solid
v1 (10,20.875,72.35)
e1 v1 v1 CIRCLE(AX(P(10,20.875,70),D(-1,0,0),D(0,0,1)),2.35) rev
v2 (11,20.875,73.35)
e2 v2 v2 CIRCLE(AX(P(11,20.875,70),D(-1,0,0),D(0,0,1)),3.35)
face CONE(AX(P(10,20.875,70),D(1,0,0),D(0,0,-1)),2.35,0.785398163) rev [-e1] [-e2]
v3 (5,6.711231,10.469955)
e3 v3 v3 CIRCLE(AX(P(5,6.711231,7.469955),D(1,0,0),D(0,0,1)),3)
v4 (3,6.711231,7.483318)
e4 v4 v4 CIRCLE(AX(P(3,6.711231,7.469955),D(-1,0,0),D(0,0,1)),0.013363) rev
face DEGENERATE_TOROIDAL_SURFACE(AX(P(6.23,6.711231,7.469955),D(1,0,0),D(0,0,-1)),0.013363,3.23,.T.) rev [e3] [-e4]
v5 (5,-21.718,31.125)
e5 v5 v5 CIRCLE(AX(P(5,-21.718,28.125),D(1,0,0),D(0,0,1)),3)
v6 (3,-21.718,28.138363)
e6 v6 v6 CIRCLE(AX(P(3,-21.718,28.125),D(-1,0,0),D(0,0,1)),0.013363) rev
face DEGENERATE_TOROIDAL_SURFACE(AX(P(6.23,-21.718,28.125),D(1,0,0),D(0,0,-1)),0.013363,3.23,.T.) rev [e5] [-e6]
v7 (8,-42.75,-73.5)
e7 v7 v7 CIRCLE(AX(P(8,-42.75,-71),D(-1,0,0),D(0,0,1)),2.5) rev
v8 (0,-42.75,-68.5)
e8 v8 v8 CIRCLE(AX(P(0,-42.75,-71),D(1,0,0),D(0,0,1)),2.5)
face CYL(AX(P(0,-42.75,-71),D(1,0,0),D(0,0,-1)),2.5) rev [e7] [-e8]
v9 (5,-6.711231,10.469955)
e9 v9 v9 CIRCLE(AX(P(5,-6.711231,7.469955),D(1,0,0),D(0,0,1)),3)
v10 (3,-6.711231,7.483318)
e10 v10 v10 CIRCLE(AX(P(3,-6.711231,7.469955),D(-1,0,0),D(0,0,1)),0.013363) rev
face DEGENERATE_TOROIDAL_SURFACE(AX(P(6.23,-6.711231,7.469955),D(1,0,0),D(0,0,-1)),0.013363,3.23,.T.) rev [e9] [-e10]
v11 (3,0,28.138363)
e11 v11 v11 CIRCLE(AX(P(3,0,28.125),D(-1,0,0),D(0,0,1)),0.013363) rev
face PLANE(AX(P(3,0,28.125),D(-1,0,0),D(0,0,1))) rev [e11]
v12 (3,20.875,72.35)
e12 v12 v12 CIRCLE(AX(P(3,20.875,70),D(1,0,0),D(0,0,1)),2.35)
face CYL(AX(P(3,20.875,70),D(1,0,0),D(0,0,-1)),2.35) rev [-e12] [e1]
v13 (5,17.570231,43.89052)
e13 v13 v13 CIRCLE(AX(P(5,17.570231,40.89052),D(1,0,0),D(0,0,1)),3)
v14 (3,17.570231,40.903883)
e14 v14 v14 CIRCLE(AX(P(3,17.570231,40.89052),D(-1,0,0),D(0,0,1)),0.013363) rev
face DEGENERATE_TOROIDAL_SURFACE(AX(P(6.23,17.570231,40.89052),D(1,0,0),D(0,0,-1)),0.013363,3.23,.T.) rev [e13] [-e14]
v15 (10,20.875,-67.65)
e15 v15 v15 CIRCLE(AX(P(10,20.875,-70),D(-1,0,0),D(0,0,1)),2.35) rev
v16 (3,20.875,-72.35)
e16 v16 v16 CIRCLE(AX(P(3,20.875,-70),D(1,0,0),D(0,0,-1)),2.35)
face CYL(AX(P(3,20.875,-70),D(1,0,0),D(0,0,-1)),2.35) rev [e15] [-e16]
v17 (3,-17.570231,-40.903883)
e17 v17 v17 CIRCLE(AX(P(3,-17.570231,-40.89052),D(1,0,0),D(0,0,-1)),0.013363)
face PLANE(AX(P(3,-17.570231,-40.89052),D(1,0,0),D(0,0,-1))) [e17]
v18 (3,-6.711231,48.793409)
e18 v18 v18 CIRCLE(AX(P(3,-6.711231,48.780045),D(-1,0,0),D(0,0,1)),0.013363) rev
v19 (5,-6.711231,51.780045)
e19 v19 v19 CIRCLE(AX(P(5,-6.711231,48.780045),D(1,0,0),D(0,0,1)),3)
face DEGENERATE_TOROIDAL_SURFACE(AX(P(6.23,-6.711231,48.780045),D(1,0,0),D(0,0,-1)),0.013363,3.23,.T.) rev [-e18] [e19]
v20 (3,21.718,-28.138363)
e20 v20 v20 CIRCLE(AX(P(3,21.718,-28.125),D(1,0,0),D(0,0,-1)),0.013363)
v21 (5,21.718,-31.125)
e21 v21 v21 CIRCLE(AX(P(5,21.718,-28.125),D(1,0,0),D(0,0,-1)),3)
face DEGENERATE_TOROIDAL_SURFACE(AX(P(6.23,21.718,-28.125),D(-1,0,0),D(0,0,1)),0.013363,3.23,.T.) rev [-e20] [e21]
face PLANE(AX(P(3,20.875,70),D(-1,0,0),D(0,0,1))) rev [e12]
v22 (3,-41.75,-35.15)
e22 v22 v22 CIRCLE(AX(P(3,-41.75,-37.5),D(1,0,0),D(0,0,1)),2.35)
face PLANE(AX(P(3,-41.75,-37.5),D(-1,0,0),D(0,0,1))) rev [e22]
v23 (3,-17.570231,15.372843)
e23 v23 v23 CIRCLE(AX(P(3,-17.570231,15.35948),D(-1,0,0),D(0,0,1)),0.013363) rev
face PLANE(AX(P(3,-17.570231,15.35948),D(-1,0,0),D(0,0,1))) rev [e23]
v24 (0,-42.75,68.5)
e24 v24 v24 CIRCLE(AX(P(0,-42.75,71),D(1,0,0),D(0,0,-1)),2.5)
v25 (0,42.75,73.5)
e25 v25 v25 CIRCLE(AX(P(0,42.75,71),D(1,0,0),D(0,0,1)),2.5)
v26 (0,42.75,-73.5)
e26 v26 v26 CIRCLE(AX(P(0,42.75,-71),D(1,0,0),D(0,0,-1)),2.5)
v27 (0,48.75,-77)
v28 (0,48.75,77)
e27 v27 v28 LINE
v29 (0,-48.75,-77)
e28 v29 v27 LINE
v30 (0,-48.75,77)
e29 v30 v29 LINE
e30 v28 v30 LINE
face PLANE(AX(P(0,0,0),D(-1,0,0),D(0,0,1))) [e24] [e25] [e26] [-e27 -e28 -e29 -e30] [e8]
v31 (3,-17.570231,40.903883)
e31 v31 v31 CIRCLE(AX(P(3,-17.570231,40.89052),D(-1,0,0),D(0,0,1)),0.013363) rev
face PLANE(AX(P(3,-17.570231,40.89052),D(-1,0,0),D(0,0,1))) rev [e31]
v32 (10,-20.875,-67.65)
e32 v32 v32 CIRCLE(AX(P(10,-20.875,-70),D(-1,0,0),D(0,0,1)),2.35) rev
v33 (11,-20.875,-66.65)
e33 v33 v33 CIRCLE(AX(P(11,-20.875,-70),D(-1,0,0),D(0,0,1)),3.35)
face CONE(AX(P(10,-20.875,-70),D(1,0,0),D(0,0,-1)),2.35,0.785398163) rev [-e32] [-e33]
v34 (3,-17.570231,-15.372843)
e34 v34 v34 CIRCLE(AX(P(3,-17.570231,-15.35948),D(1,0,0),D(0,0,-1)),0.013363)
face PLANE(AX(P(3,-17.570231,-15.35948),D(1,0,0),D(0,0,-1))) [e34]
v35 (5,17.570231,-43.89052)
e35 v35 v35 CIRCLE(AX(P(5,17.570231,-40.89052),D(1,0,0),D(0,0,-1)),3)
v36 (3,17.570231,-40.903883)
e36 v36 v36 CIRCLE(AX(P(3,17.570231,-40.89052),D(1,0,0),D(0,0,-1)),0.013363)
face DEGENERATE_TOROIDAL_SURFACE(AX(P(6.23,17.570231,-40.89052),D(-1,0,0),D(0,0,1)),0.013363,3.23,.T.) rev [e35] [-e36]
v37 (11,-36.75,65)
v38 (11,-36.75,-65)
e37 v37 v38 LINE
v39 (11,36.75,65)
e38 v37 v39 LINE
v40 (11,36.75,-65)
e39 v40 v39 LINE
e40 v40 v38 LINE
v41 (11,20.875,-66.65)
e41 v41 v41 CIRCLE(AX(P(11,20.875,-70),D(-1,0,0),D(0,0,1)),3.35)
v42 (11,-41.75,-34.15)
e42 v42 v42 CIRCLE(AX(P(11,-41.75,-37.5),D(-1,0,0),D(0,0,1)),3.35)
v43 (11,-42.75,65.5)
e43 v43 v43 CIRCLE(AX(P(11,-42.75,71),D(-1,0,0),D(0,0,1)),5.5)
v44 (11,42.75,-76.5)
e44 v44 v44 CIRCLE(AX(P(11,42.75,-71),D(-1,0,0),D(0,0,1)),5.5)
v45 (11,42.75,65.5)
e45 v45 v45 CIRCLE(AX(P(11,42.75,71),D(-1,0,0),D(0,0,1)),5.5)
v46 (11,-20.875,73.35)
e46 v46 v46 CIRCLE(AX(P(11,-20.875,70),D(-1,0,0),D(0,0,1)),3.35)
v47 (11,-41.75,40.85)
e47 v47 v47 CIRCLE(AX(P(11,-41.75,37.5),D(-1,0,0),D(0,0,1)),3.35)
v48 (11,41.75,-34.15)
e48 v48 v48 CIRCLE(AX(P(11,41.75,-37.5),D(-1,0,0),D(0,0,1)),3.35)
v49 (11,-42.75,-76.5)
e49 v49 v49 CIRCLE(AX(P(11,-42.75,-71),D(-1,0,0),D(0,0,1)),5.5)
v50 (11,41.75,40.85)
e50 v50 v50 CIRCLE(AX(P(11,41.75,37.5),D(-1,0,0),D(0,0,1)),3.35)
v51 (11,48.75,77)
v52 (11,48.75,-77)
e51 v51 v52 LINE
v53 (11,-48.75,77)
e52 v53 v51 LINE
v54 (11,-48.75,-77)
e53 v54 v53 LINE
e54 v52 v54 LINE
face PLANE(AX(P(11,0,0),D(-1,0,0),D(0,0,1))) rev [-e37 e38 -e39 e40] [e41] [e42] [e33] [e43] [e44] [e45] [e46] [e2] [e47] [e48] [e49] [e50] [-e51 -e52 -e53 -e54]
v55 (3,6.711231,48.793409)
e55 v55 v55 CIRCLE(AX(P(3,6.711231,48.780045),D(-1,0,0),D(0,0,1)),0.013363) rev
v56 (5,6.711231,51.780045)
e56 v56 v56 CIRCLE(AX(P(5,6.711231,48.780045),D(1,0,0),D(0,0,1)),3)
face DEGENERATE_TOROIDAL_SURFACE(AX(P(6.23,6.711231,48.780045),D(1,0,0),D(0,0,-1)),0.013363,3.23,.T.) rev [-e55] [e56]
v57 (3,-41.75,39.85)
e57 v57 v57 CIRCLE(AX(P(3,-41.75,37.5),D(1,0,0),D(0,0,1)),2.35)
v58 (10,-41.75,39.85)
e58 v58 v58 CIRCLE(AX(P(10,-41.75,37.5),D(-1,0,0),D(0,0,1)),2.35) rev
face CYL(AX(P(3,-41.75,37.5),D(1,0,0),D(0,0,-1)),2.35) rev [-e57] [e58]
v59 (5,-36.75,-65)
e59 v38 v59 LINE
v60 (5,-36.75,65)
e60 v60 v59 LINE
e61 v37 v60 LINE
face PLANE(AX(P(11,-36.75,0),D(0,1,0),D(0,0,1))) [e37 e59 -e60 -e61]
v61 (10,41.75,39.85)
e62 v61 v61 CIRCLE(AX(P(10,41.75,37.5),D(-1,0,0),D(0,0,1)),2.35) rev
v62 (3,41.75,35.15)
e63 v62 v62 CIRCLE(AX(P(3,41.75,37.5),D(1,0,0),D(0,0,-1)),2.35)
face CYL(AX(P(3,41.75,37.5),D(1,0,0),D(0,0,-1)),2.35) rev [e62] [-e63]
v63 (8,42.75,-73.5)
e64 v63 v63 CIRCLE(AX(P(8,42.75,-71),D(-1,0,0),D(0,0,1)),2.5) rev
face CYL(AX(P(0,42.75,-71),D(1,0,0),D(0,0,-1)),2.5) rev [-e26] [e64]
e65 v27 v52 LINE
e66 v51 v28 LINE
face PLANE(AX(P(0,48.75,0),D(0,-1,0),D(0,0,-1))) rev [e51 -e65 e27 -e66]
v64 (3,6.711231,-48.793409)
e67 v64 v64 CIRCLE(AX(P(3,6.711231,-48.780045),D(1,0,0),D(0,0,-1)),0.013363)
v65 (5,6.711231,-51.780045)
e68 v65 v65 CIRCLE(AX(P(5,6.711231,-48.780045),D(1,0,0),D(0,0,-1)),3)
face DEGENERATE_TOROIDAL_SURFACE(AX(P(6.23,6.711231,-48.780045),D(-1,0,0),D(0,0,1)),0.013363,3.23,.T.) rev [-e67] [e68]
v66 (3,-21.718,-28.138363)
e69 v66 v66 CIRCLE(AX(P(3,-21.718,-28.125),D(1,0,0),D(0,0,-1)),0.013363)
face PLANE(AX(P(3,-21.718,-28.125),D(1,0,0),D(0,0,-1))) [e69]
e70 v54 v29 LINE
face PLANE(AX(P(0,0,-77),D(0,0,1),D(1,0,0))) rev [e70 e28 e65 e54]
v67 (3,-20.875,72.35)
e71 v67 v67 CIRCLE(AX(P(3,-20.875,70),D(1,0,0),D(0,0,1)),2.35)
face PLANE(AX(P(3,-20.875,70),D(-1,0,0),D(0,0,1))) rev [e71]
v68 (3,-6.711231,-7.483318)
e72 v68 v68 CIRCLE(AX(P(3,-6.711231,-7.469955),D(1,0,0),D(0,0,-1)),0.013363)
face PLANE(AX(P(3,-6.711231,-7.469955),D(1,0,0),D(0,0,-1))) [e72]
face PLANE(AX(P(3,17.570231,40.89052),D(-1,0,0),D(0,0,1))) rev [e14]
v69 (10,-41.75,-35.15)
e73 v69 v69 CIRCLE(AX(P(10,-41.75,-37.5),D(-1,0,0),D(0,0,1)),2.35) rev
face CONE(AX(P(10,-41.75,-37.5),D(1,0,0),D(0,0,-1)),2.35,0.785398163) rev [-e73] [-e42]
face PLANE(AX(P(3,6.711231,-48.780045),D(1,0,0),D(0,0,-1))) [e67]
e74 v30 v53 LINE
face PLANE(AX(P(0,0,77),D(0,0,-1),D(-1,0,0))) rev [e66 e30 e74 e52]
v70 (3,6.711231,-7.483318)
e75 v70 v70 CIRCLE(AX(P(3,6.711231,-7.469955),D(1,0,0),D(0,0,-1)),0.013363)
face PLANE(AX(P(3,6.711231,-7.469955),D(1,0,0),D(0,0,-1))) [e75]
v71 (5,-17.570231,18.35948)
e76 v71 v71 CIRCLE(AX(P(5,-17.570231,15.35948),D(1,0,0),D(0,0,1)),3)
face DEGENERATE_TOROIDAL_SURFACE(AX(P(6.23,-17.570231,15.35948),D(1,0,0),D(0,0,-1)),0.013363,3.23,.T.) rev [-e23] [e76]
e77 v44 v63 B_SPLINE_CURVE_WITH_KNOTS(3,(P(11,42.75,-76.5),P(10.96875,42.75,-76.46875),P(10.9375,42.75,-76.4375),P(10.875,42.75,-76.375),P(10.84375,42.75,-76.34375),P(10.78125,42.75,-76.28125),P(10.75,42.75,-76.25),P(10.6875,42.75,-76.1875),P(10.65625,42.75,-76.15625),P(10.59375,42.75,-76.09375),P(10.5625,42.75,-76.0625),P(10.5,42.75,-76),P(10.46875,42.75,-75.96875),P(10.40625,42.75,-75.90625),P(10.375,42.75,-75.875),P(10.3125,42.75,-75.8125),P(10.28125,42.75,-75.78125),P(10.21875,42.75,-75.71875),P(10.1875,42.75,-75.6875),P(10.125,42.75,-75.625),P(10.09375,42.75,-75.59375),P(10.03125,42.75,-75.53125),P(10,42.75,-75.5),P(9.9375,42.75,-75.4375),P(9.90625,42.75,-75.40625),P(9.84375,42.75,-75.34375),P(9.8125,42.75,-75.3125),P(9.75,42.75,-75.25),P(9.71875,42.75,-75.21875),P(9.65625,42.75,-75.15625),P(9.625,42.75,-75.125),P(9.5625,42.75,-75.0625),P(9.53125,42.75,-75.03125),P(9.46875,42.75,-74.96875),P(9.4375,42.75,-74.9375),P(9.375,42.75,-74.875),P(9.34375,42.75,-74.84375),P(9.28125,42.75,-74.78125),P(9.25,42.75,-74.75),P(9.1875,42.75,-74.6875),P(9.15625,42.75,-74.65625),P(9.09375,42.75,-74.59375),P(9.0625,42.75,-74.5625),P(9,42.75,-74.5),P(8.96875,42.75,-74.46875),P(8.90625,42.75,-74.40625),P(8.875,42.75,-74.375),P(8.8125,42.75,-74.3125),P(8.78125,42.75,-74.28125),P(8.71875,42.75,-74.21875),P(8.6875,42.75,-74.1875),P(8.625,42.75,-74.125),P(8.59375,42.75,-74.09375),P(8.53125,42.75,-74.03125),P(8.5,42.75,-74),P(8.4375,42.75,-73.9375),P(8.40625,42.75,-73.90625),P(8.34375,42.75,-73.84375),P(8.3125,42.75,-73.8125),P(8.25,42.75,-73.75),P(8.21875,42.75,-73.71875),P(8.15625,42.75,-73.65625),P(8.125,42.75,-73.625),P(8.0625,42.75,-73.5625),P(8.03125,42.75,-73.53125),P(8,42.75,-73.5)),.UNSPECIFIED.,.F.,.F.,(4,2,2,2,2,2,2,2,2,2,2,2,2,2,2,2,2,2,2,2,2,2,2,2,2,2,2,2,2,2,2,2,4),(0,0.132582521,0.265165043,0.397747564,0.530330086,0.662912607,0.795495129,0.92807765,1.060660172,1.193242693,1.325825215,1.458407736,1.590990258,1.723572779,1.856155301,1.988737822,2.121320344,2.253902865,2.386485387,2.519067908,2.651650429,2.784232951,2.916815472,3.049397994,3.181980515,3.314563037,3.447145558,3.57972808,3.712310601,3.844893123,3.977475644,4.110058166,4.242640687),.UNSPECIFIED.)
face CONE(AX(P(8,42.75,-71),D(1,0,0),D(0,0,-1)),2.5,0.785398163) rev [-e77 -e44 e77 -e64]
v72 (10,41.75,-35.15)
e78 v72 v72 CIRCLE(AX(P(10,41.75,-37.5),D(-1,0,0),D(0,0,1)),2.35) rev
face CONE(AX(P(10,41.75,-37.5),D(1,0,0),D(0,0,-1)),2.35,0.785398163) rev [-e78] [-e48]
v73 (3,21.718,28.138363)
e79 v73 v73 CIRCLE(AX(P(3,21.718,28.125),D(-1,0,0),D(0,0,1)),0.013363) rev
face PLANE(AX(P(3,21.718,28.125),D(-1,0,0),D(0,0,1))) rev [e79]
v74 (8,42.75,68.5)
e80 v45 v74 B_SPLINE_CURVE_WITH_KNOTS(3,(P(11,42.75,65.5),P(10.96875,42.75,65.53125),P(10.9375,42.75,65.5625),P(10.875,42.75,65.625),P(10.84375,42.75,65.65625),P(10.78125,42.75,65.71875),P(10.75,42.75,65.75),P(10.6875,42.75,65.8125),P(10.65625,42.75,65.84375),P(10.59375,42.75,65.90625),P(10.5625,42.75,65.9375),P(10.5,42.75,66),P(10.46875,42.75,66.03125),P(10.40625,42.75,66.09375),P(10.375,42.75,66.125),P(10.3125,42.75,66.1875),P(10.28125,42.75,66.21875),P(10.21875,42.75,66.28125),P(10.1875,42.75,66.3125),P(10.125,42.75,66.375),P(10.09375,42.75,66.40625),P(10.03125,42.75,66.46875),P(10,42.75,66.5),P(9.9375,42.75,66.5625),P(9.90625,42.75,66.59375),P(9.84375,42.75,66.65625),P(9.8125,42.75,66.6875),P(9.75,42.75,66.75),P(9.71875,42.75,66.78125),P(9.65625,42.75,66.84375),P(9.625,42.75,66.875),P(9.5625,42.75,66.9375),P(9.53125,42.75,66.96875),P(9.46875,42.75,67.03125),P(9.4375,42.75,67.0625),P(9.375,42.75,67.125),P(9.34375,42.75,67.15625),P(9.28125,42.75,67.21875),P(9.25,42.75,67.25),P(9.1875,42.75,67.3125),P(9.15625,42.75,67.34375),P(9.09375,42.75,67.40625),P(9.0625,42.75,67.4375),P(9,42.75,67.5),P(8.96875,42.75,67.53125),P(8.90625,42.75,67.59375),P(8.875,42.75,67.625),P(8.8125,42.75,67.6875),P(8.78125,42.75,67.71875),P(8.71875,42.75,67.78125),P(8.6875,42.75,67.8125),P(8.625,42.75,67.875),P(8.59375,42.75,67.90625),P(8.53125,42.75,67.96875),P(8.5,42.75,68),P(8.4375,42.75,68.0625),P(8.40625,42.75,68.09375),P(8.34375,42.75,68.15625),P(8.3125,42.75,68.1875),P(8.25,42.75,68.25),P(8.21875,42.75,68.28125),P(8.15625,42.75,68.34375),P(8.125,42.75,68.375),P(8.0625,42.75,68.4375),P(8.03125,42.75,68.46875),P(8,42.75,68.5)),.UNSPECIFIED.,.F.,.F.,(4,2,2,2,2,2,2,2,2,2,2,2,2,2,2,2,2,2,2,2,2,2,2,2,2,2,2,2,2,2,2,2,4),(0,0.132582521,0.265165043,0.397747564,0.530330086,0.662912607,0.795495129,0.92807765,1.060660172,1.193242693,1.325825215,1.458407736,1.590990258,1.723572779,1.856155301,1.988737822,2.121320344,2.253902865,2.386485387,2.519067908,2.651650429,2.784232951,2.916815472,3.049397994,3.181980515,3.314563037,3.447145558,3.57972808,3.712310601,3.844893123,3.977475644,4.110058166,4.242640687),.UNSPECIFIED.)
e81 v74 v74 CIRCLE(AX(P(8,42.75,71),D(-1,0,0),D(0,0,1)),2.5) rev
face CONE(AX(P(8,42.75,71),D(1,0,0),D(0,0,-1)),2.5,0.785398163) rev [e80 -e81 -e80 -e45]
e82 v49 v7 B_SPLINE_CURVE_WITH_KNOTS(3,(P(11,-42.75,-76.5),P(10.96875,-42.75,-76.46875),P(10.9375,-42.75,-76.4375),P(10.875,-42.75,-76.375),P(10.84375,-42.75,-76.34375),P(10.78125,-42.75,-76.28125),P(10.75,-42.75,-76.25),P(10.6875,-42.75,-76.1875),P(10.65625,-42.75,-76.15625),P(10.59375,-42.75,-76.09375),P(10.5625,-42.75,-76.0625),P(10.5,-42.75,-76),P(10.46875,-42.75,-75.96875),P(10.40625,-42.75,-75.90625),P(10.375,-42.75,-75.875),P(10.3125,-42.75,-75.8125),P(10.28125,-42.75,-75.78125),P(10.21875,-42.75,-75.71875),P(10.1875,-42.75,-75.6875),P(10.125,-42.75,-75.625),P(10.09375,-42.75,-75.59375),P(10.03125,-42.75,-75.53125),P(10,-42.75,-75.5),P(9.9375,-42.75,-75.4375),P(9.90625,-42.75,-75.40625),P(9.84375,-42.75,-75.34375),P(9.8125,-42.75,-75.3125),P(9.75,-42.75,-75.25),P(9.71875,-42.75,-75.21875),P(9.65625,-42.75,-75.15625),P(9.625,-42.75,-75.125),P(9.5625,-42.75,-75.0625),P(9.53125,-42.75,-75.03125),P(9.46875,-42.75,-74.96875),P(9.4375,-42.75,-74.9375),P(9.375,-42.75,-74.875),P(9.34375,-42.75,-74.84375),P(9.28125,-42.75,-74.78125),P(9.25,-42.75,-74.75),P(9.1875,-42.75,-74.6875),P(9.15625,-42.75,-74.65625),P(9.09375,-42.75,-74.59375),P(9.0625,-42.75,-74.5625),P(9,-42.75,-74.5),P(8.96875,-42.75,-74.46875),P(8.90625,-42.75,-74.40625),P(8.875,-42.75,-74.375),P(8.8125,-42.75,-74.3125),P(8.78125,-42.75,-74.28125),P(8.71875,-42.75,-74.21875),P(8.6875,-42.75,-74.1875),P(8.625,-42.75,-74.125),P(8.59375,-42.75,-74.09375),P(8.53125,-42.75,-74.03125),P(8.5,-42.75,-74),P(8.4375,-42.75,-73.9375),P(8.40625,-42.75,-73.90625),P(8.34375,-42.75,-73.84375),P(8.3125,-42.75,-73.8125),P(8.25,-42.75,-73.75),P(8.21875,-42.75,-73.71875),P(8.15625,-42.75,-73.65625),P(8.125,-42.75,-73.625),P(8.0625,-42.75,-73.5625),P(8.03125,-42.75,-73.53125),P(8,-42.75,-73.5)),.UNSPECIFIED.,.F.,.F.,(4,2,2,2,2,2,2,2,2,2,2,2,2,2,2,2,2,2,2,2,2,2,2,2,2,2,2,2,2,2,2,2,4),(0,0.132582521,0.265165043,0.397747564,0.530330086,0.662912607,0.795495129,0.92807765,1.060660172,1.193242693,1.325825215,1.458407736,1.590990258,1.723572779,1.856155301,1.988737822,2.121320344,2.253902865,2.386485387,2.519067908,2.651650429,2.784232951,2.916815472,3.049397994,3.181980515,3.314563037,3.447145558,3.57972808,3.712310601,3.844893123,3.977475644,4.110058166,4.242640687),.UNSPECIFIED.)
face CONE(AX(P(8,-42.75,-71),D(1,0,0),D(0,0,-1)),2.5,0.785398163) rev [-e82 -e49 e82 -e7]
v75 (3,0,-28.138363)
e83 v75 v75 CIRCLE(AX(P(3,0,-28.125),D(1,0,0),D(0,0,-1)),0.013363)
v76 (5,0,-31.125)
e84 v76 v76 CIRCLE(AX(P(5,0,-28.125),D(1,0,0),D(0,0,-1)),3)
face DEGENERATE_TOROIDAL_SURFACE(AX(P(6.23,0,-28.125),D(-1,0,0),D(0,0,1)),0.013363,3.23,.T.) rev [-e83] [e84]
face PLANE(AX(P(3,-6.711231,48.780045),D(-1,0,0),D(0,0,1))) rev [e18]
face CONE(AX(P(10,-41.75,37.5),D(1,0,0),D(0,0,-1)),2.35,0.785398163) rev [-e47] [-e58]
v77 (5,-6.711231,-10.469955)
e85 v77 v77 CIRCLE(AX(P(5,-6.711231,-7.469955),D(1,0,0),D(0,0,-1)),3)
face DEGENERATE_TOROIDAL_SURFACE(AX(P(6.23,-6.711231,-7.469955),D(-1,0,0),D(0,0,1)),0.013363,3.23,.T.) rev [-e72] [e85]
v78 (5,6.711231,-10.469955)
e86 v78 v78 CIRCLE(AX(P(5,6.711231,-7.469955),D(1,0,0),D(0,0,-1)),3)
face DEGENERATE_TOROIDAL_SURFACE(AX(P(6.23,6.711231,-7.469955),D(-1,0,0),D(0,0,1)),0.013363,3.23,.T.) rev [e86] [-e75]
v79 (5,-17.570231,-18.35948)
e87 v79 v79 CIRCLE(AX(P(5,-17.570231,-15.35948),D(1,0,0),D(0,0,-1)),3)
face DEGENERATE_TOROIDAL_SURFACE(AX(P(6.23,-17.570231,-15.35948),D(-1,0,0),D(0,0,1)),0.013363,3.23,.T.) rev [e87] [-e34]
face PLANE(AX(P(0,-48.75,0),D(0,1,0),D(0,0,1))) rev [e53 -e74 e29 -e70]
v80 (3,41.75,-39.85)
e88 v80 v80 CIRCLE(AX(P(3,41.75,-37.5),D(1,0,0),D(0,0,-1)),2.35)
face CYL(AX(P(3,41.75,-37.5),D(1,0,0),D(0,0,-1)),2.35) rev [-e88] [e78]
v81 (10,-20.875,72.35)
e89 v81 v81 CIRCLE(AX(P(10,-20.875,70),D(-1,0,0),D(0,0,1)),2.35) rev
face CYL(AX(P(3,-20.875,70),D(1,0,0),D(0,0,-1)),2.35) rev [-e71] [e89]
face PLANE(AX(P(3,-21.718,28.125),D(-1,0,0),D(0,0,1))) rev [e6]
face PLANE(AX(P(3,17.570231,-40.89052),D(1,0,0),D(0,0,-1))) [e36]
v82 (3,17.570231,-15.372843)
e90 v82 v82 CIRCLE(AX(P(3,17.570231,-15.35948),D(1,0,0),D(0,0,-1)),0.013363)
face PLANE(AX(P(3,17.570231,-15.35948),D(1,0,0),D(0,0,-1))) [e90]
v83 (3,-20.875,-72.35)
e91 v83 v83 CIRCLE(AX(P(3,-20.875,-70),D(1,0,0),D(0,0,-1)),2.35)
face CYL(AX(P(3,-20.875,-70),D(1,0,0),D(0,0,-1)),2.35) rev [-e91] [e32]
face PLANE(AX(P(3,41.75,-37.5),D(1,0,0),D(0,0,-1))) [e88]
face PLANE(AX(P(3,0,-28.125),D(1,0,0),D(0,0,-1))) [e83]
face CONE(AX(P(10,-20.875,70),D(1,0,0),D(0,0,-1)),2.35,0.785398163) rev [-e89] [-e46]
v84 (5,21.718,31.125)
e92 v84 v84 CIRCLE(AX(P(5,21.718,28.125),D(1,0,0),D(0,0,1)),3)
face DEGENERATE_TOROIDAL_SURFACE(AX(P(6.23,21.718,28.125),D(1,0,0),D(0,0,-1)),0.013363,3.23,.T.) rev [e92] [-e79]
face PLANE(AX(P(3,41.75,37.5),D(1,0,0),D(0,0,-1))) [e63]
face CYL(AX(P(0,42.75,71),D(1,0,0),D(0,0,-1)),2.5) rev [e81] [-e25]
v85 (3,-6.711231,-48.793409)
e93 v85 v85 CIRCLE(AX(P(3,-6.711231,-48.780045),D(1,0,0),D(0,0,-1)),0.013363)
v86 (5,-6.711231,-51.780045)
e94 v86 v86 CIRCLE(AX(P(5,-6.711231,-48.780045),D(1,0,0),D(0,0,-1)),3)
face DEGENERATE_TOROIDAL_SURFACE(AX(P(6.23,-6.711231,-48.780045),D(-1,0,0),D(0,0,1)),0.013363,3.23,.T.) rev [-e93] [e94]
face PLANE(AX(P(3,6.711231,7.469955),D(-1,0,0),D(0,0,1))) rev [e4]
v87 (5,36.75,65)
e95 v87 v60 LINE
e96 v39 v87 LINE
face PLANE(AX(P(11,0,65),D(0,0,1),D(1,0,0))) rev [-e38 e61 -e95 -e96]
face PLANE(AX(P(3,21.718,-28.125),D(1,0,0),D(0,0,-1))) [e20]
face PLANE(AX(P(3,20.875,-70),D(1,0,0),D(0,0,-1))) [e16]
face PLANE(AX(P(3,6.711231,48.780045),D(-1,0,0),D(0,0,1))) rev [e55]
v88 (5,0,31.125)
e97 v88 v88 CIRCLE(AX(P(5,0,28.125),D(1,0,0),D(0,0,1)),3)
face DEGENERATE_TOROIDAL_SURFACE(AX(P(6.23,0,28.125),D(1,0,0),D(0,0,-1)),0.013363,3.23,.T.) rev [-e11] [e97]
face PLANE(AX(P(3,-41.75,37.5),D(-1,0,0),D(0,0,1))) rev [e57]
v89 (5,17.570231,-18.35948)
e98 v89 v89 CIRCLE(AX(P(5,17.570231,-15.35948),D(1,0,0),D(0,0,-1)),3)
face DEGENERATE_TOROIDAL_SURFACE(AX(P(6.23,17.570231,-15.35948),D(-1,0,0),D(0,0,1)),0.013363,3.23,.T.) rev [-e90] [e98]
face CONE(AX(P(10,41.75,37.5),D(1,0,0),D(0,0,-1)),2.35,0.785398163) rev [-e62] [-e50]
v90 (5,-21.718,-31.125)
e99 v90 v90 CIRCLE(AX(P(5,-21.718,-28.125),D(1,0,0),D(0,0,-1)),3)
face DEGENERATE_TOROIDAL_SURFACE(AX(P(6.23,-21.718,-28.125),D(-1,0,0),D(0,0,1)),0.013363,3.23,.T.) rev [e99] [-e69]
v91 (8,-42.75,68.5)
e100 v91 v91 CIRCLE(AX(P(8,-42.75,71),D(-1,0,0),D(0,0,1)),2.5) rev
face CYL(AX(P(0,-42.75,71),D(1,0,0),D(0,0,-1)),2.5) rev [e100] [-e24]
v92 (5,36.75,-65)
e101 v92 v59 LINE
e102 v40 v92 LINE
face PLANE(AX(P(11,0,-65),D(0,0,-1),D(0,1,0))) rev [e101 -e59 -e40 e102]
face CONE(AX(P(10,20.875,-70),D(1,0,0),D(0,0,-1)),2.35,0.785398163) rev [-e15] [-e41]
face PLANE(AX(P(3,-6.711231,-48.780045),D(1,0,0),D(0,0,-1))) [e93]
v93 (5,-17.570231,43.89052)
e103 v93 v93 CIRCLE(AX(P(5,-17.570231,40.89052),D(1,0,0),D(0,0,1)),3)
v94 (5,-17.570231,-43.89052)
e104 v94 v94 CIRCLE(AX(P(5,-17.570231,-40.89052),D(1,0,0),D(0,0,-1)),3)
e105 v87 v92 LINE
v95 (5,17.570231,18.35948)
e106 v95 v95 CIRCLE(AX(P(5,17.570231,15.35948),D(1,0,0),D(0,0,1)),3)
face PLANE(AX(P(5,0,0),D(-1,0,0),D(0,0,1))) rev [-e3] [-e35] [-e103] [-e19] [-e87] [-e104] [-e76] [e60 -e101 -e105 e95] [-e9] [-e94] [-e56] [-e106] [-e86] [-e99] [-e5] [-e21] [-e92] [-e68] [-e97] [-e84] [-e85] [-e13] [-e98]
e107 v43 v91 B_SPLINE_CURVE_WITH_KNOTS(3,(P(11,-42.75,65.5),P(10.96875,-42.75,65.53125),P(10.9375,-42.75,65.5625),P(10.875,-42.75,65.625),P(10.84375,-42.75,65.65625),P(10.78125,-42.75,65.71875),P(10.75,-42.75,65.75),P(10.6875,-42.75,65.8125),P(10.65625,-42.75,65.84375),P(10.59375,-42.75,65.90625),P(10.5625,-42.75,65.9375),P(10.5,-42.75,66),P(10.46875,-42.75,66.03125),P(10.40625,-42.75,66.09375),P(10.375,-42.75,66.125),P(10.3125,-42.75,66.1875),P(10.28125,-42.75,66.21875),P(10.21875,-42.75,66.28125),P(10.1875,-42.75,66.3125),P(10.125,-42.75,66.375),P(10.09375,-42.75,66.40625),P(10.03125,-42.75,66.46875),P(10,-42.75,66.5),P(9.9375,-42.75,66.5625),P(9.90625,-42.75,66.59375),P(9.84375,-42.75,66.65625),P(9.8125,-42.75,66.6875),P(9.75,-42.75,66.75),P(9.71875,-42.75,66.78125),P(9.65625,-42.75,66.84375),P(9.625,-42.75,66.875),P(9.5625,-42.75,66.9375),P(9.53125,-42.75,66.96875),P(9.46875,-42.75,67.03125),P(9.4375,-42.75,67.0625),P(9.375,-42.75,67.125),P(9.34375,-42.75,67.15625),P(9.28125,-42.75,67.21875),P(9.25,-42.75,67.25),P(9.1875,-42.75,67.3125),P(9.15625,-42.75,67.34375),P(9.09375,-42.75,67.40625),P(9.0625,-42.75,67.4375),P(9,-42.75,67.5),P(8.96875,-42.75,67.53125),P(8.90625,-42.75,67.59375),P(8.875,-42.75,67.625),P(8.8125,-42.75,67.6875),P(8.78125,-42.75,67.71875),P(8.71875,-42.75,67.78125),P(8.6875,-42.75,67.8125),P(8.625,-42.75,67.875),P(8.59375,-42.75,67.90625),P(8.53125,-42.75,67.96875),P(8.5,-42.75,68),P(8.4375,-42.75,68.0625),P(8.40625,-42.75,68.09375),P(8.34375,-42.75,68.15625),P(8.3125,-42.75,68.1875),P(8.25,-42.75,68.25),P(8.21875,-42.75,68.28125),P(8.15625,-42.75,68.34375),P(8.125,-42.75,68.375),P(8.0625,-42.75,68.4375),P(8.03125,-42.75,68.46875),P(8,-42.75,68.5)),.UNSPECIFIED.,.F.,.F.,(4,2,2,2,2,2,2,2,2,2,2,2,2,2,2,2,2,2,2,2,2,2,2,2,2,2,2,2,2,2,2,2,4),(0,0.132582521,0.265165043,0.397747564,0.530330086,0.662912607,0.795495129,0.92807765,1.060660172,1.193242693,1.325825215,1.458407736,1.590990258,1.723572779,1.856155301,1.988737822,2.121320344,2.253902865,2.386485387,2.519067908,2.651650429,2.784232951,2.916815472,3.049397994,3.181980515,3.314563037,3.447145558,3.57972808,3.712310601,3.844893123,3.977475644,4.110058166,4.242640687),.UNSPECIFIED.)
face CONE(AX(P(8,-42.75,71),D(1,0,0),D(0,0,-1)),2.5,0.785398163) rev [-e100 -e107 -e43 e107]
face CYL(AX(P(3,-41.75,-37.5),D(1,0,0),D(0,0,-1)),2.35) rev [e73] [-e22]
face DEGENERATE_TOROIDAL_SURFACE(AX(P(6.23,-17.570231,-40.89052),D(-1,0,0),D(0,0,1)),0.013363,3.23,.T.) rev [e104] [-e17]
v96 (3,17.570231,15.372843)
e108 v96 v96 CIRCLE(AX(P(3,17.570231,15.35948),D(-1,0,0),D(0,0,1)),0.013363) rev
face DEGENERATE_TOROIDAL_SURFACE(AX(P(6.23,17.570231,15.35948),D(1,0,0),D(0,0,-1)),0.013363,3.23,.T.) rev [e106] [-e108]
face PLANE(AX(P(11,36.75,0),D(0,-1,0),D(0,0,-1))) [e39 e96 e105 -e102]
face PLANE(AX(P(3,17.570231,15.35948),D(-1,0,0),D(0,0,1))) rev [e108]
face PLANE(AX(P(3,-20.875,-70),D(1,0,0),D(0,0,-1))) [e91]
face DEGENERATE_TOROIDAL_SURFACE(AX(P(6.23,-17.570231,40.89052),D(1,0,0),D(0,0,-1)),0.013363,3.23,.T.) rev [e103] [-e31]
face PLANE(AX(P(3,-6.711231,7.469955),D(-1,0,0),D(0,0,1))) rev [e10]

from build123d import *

# Parameters (mm, degrees)
SKETCH1_W           = 130
SKETCH1_H           = 73.5
BOSS_EXTRUDE1_DEPTH = 5
SKETCH2_R           = 3
CUT_EXTRUDE1_DEPTH  = 2
FILLET1_R           = 3.23
SKETCH3_W           = 10
SKETCH3_H           = 73.5
BOSS_EXTRUDE2_DEPTH = 11
SKETCH4_R           = 2.35
CUT_EXTRUDE2_DEPTH  = 8
CHAMFER1_SIZE       = 1
SKETCH5_W           = 11
SKETCH5_H           = 150
BOSS_EXTRUDE3_DEPTH = 2
SKETCH6_W           = 11
SKETCH6_H           = 150
BOSS_EXTRUDE4_DEPTH = 2
SKETCH7_W           = 11
SKETCH7_H           = 97.5
BOSS_EXTRUDE5_DEPTH = 2
SKETCH8_W           = 11
SKETCH8_H           = 97.5
BOSS_EXTRUDE6_DEPTH = 2
SKETCH12_R          = 2.5
CUT_EXTRUDE3_DEPTH  = 92.796309839
CHAMFER2_SIZE       = 3


with BuildPart() as part:
    # Sketch1 → Boss-Extrude1 (new body)
    with BuildSketch(Plane(origin=(0, 0, 0), x_dir=(0, 0, -1), z_dir=(1, 0, 0))):
        Rectangle(SKETCH1_W, SKETCH1_H)
    extrude(amount=BOSS_EXTRUDE1_DEPTH)

    # Sketch2 → Cut-Extrude1 (cut)
    with BuildSketch(Plane(origin=(5, 0, 0), x_dir=(0, 0, -1), z_dir=(1, 0, 0))):
        with Locations((28.125, -21.718)):
            Circle(SKETCH2_R)
        with Locations((15.359479891, -17.570231084)):
            Circle(SKETCH2_R)
        with Locations((7.469954579, -6.711231084)):
            Circle(SKETCH2_R)
        with Locations((7.469954579, 6.711231084)):
            Circle(SKETCH2_R)
        with Locations((15.359479891, 17.570231084)):
            Circle(SKETCH2_R)
        with Locations((28.125, 21.718)):
            Circle(SKETCH2_R)
        with Locations((40.890520109, 17.570231084)):
            Circle(SKETCH2_R)
        with Locations((48.780045421, 6.711231084)):
            Circle(SKETCH2_R)
        with Locations((48.780045421, -6.711231084)):
            Circle(SKETCH2_R)
        with Locations((40.890520109, -17.570231084)):
            Circle(SKETCH2_R)
        with Locations(Location((-7.469954579, -6.711231084, 0), (0, 0, 180))):
            Circle(SKETCH2_R)
        with Locations(Location((-15.359479891, -17.570231084, 0), (0, 0, 180))):
            Circle(SKETCH2_R)
        with Locations(Location((-28.125, -21.718, 0), (0, 0, 180))):
            Circle(SKETCH2_R)
        with Locations(Location((-40.890520109, -17.570231084, 0), (0, 0, 180))):
            Circle(SKETCH2_R)
        with Locations(Location((-48.780045421, -6.711231084, 0), (0, 0, 180))):
            Circle(SKETCH2_R)
        with Locations(Location((-48.780045421, 6.711231084, 0), (0, 0, 180))):
            Circle(SKETCH2_R)
        with Locations(Location((-40.890520109, 17.570231084, 0), (0, 0, 180))):
            Circle(SKETCH2_R)
        with Locations(Location((-28.125, 21.718, 0), (0, 0, 180))):
            Circle(SKETCH2_R)
        with Locations(Location((-15.359479891, 17.570231084, 0), (0, 0, 180))):
            Circle(SKETCH2_R)
        with Locations(Location((-7.469954579, 6.711231084, 0), (0, 0, 180))):
            Circle(SKETCH2_R)
        with Locations((28.125, 0)):
            Circle(SKETCH2_R)
        with Locations(Location((-28.125, 0, 0), (0, 0, 180))):
            Circle(SKETCH2_R)
    extrude(amount=-CUT_EXTRUDE1_DEPTH, mode=Mode.SUBTRACT)

    # Fillet1
    # the kernel refuses this fillet: 3.23 mm, written as the material it adds along each edge
    with BuildSketch(Plane(origin=(3, 17.570231084, 40.890520109), x_dir=(0, 0, 1), z_dir=(0, 1, 0))) as fillet1_piece_1:
        with BuildLine():
            CenterArc((0.013363095, 3.23), FILLET1_R, 270, 67.616447755)
            Line((0.013363095, 0), (0.013363095, -0.0646))
            Line((0.013363095, -0.0646), (3, -0.0646))
            Line((3, -0.0646), (3.0646, 0))
            ThreePointArc((3.0646, 0), (3.0646, 1), (3.059732738, 1.9754))
            Line((3.059732738, 1.9754), (3, 2))
        make_face()
    revolve(axis=Axis((3, 17.570231084, 40.890520109), (1, 0, 0)))
    with BuildSketch(Plane(origin=(3, 6.711231084, 48.780045421), x_dir=(0, 0, 1), z_dir=(0, 1, 0))) as fillet1_piece_2:
        with BuildLine():
            CenterArc((0.013363095, 3.23), FILLET1_R, 270, 67.616447755)
            Line((0.013363095, 0), (0.013363095, -0.0646))
            Line((0.013363095, -0.0646), (3, -0.0646))
            Line((3, -0.0646), (3.0646, 0))
            ThreePointArc((3.0646, 0), (3.0646, 1), (3.059732738, 1.9754))
            Line((3.059732738, 1.9754), (3, 2))
        make_face()
    revolve(axis=Axis((3, 6.711231084, 48.780045421), (1, 0, 0)))
    with BuildSketch(Plane(origin=(3, -6.711231084, 48.780045421), x_dir=(0, 0, 1), z_dir=(0, 1, 0))) as fillet1_piece_3:
        with BuildLine():
            CenterArc((0.013363095, 3.23), FILLET1_R, 270, 67.616447755)
            Line((0.013363095, 0), (0.013363095, -0.0646))
            Line((0.013363095, -0.0646), (3, -0.0646))
            Line((3, -0.0646), (3.0646, 0))
            ThreePointArc((3.0646, 0), (3.0646, 1), (3.059732738, 1.9754))
            Line((3.059732738, 1.9754), (3, 2))
        make_face()
    revolve(axis=Axis((3, -6.711231084, 48.780045421), (1, 0, 0)))
    with BuildSketch(Plane(origin=(3, -17.570231084, 40.890520109), x_dir=(0, 0, 1), z_dir=(0, 1, 0))) as fillet1_piece_4:
        with BuildLine():
            CenterArc((0.013363095, 3.23), FILLET1_R, 270, 67.616447755)
            Line((0.013363095, 0), (0.013363095, -0.0646))
            Line((0.013363095, -0.0646), (3, -0.0646))
            Line((3, -0.0646), (3.0646, 0))
            ThreePointArc((3.0646, 0), (3.0646, 1), (3.059732738, 1.9754))
            Line((3.059732738, 1.9754), (3, 2))
        make_face()
    revolve(axis=Axis((3, -17.570231084, 40.890520109), (1, 0, 0)))
    with BuildSketch(Plane(origin=(3, -21.718, 28.125), x_dir=(0, 0, 1), z_dir=(0, 1, 0))) as fillet1_piece_5:
        with BuildLine():
            CenterArc((0.013363095, 3.23), FILLET1_R, 270, 67.616447755)
            Line((0.013363095, 0), (0.013363095, -0.0646))
            Line((0.013363095, -0.0646), (3, -0.0646))
            Line((3, -0.0646), (3.0646, 0))
            ThreePointArc((3.0646, 0), (3.0646, 1), (3.059732738, 1.9754))
            Line((3.059732738, 1.9754), (3, 2))
        make_face()
    revolve(axis=Axis((3, -21.718, 28.125), (1, 0, 0)))
    with BuildSketch(Plane(origin=(3, -17.570231084, 15.359479891), x_dir=(0, 0, 1), z_dir=(0, 1, 0))) as fillet1_piece_6:
        with BuildLine():
            CenterArc((0.013363095, 3.23), FILLET1_R, 270, 67.616447755)
            Line((0.013363095, 0), (0.013363095, -0.0646))
            Line((0.013363095, -0.0646), (3, -0.0646))
            Line((3, -0.0646), (3.0646, 0))
            ThreePointArc((3.0646, 0), (3.0646, 1), (3.059732738, 1.9754))
            Line((3.059732738, 1.9754), (3, 2))
        make_face()
    revolve(axis=Axis((3, -17.570231084, 15.359479891), (1, 0, 0)))
    with BuildSketch(Plane(origin=(3, -17.570231084, -40.890520109), x_dir=(0, 0, -1), z_dir=(0, -1, 0))) as fillet1_piece_7:
        with BuildLine():
            CenterArc((0.013363095, 3.23), FILLET1_R, 270, 67.616447755)
            Line((0.013363095, 0), (0.013363095, -0.0646))
            Line((0.013363095, -0.0646), (3, -0.0646))
            Line((3, -0.0646), (3.0646, 0))
            ThreePointArc((3.0646, 0), (3.0646, 1), (3.059732738, 1.9754))
            Line((3.059732738, 1.9754), (3, 2))
        make_face()
    revolve(axis=Axis((3, -17.570231084, -40.890520109), (1, 0, 0)))
    with BuildSketch(Plane(origin=(3, -6.711231084, -48.780045421), x_dir=(0, 0, -1), z_dir=(0, -1, 0))) as fillet1_piece_8:
        with BuildLine():
            CenterArc((0.013363095, 3.23), FILLET1_R, 270, 67.616447755)
            Line((0.013363095, 0), (0.013363095, -0.0646))
            Line((0.013363095, -0.0646), (3, -0.0646))
            Line((3, -0.0646), (3.0646, 0))
            ThreePointArc((3.0646, 0), (3.0646, 1), (3.059732738, 1.9754))
            Line((3.059732738, 1.9754), (3, 2))
        make_face()
    revolve(axis=Axis((3, -6.711231084, -48.780045421), (1, 0, 0)))
    with BuildSketch(Plane(origin=(3, 6.711231084, -7.469954579), x_dir=(0, 0, -1), z_dir=(0, -1, 0))) as fillet1_piece_9:
        with BuildLine():
            CenterArc((0.013363095, 3.23), FILLET1_R, 270, 67.616447755)
            Line((0.013363095, 0), (0.013363095, -0.0646))
            Line((0.013363095, -0.0646), (3, -0.0646))
            Line((3, -0.0646), (3.0646, 0))
            ThreePointArc((3.0646, 0), (3.0646, 1), (3.059732738, 1.9754))
            Line((3.059732738, 1.9754), (3, 2))
        make_face()
    revolve(axis=Axis((3, 6.711231084, -7.469954579), (1, 0, 0)))
    with BuildSketch(Plane(origin=(3, -6.711231084, -7.469954579), x_dir=(0, 0, -1), z_dir=(0, -1, 0))) as fillet1_piece_10:
        with BuildLine():
            CenterArc((0.013363095, 3.23), FILLET1_R, 270, 67.616447755)
            Line((0.013363095, 0), (0.013363095, -0.0646))
            Line((0.013363095, -0.0646), (3, -0.0646))
            Line((3, -0.0646), (3.0646, 0))
            ThreePointArc((3.0646, 0), (3.0646, 1), (3.059732738, 1.9754))
            Line((3.059732738, 1.9754), (3, 2))
        make_face()
    revolve(axis=Axis((3, -6.711231084, -7.469954579), (1, 0, 0)))
    with BuildSketch(Plane(origin=(3, -17.570231084, -15.359479891), x_dir=(0, 0, -1), z_dir=(0, -1, 0))) as fillet1_piece_11:
        with BuildLine():
            CenterArc((0.013363095, 3.23), FILLET1_R, 270, 67.616447755)
            Line((0.013363095, 0), (0.013363095, -0.0646))
            Line((0.013363095, -0.0646), (3, -0.0646))
            Line((3, -0.0646), (3.0646, 0))
            ThreePointArc((3.0646, 0), (3.0646, 1), (3.059732738, 1.9754))
            Line((3.059732738, 1.9754), (3, 2))
        make_face()
    revolve(axis=Axis((3, -17.570231084, -15.359479891), (1, 0, 0)))
    with BuildSketch(Plane(origin=(3, -6.711231084, 7.469954579), x_dir=(0, 0, 1), z_dir=(0, 1, 0))) as fillet1_piece_12:
        with BuildLine():
            CenterArc((0.013363095, 3.23), FILLET1_R, 270, 67.616447755)
            Line((0.013363095, 0), (0.013363095, -0.0646))
            Line((0.013363095, -0.0646), (3, -0.0646))
            Line((3, -0.0646), (3.0646, 0))
            ThreePointArc((3.0646, 0), (3.0646, 1), (3.059732738, 1.9754))
            Line((3.059732738, 1.9754), (3, 2))
        make_face()
    revolve(axis=Axis((3, -6.711231084, 7.469954579), (1, 0, 0)))
    with BuildSketch(Plane(origin=(3, 17.570231084, -15.359479891), x_dir=(0, 0, -1), z_dir=(0, -1, 0))) as fillet1_piece_13:
        with BuildLine():
            CenterArc((0.013363095, 3.23), FILLET1_R, 270, 67.616447755)
            Line((0.013363095, 0), (0.013363095, -0.0646))
            Line((0.013363095, -0.0646), (3, -0.0646))
            Line((3, -0.0646), (3.0646, 0))
            ThreePointArc((3.0646, 0), (3.0646, 1), (3.059732738, 1.9754))
            Line((3.059732738, 1.9754), (3, 2))
        make_face()
    revolve(axis=Axis((3, 17.570231084, -15.359479891), (1, 0, 0)))
    with BuildSketch(Plane(origin=(3, 21.718, -28.125), x_dir=(0, 0, -1), z_dir=(0, -1, 0))) as fillet1_piece_14:
        with BuildLine():
            CenterArc((0.013363095, 3.23), FILLET1_R, 270, 67.616447755)
            Line((0.013363095, 0), (0.013363095, -0.0646))
            Line((0.013363095, -0.0646), (3, -0.0646))
            Line((3, -0.0646), (3.0646, 0))
            ThreePointArc((3.0646, 0), (3.0646, 1), (3.059732738, 1.9754))
            Line((3.059732738, 1.9754), (3, 2))
        make_face()
    revolve(axis=Axis((3, 21.718, -28.125), (1, 0, 0)))
    with BuildSketch(Plane(origin=(3, 17.570231084, -40.890520109), x_dir=(0, 0, -1), z_dir=(0, -1, 0))) as fillet1_piece_15:
        with BuildLine():
            CenterArc((0.013363095, 3.23), FILLET1_R, 270, 67.616447755)
            Line((0.013363095, 0), (0.013363095, -0.0646))
            Line((0.013363095, -0.0646), (3, -0.0646))
            Line((3, -0.0646), (3.0646, 0))
            ThreePointArc((3.0646, 0), (3.0646, 1), (3.059732738, 1.9754))
            Line((3.059732738, 1.9754), (3, 2))
        make_face()
    revolve(axis=Axis((3, 17.570231084, -40.890520109), (1, 0, 0)))
    with BuildSketch(Plane(origin=(3, 6.711231084, -48.780045421), x_dir=(0, 0, -1), z_dir=(0, -1, 0))) as fillet1_piece_16:
        with BuildLine():
            CenterArc((0.013363095, 3.23), FILLET1_R, 270, 67.616447755)
            Line((0.013363095, 0), (0.013363095, -0.0646))
            Line((0.013363095, -0.0646), (3, -0.0646))
            Line((3, -0.0646), (3.0646, 0))
            ThreePointArc((3.0646, 0), (3.0646, 1), (3.059732738, 1.9754))
            Line((3.059732738, 1.9754), (3, 2))
        make_face()
    revolve(axis=Axis((3, 6.711231084, -48.780045421), (1, 0, 0)))
    with BuildSketch(Plane(origin=(3, 0, 28.125), x_dir=(0, 0, 1), z_dir=(0, 1, 0))) as fillet1_piece_17:
        with BuildLine():
            CenterArc((0.013363095, 3.23), FILLET1_R, 270, 67.616447755)
            Line((0.013363095, 0), (0.013363095, -0.0646))
            Line((0.013363095, -0.0646), (3, -0.0646))
            Line((3, -0.0646), (3.0646, 0))
            ThreePointArc((3.0646, 0), (3.0646, 1), (3.059732738, 1.9754))
            Line((3.059732738, 1.9754), (3, 2))
        make_face()
    revolve(axis=Axis((3, 0, 28.125), (1, 0, 0)))
    with BuildSketch(Plane(origin=(3, 0, -28.125), x_dir=(0, 0, -1), z_dir=(0, -1, 0))) as fillet1_piece_18:
        with BuildLine():
            CenterArc((0.013363095, 3.23), FILLET1_R, 270, 67.616447755)
            Line((0.013363095, 0), (0.013363095, -0.0646))
            Line((0.013363095, -0.0646), (3, -0.0646))
            Line((3, -0.0646), (3.0646, 0))
            ThreePointArc((3.0646, 0), (3.0646, 1), (3.059732738, 1.9754))
            Line((3.059732738, 1.9754), (3, 2))
        make_face()
    revolve(axis=Axis((3, 0, -28.125), (1, 0, 0)))
    with BuildSketch(Plane(origin=(3, 6.711231084, 7.469954579), x_dir=(0, 0, 1), z_dir=(0, 1, 0))) as fillet1_piece_19:
        with BuildLine():
            CenterArc((0.013363095, 3.23), FILLET1_R, 270, 67.616447755)
            Line((0.013363095, 0), (0.013363095, -0.0646))
            Line((0.013363095, -0.0646), (3, -0.0646))
            Line((3, -0.0646), (3.0646, 0))
            ThreePointArc((3.0646, 0), (3.0646, 1), (3.059732738, 1.9754))
            Line((3.059732738, 1.9754), (3, 2))
        make_face()
    revolve(axis=Axis((3, 6.711231084, 7.469954579), (1, 0, 0)))
    with BuildSketch(Plane(origin=(3, 17.570231084, 15.359479891), x_dir=(0, 0, 1), z_dir=(0, 1, 0))) as fillet1_piece_20:
        with BuildLine():
            CenterArc((0.013363095, 3.23), FILLET1_R, 270, 67.616447755)
            Line((0.013363095, 0), (0.013363095, -0.0646))
            Line((0.013363095, -0.0646), (3, -0.0646))
            Line((3, -0.0646), (3.0646, 0))
            ThreePointArc((3.0646, 0), (3.0646, 1), (3.059732738, 1.9754))
            Line((3.059732738, 1.9754), (3, 2))
        make_face()
    revolve(axis=Axis((3, 17.570231084, 15.359479891), (1, 0, 0)))
    with BuildSketch(Plane(origin=(3, 21.718, 28.125), x_dir=(0, 0, 1), z_dir=(0, 1, 0))) as fillet1_piece_21:
        with BuildLine():
            CenterArc((0.013363095, 3.23), FILLET1_R, 270, 67.616447755)
            Line((0.013363095, 0), (0.013363095, -0.0646))
            Line((0.013363095, -0.0646), (3, -0.0646))
            Line((3, -0.0646), (3.0646, 0))
            ThreePointArc((3.0646, 0), (3.0646, 1), (3.059732738, 1.9754))
            Line((3.059732738, 1.9754), (3, 2))
        make_face()
    revolve(axis=Axis((3, 21.718, 28.125), (1, 0, 0)))
    with BuildSketch(Plane(origin=(3, -21.718, -28.125), x_dir=(0, 0, -1), z_dir=(0, -1, 0))) as fillet1_piece_22:
        with BuildLine():
            CenterArc((0.013363095, 3.23), FILLET1_R, 270, 67.616447755)
            Line((0.013363095, 0), (0.013363095, -0.0646))
            Line((0.013363095, -0.0646), (3, -0.0646))
            Line((3, -0.0646), (3.0646, 0))
            ThreePointArc((3.0646, 0), (3.0646, 1), (3.059732738, 1.9754))
            Line((3.059732738, 1.9754), (3, 2))
        make_face()
    revolve(axis=Axis((3, -21.718, -28.125), (1, 0, 0)))

    # Sketch3 → Boss-Extrude2 (add)
    with BuildSketch(Plane.ZY):
        Polygon((65, 36.75), (75, 36.75), (75, 46.75), (-75, 46.75), (-75, 36.75), (-65, 36.75), align=None)
        with Locations((70, 0)):
            Rectangle(SKETCH3_W, SKETCH3_H)
        Polygon((-65, -36.75), (-75, -36.75), (-75, -46.75), (75, -46.75), (75, -36.75), (65, -36.75), align=None)
        with Locations((-70, 0)):
            Rectangle(SKETCH3_W, SKETCH3_H)
    extrude(amount=-BOSS_EXTRUDE2_DEPTH)

    # Sketch4 → Cut-Extrude2 (cut)
    with BuildSketch(Plane(origin=(11, 0, 0), x_dir=(0, 0, -1), z_dir=(1, 0, 0))):
        with Locations((-37.5, 41.75)):
            Circle(SKETCH4_R)
        with Locations((37.5, 41.75)):
            Circle(SKETCH4_R)
        with Locations((70, 20.875)):
            Circle(SKETCH4_R)
        with Locations(Location((37.5, -41.75, 0), (0, 0, 180))):
            Circle(SKETCH4_R)
        with Locations(Location((-37.5, -41.75, 0), (0, 0, 180))):
            Circle(SKETCH4_R)
        with Locations(Location((-70, 20.875, 0), (0, 0, 180))):
            Circle(SKETCH4_R)
        with Locations((70, -20.875)):
            Circle(SKETCH4_R)
        with Locations(Location((-70, -20.875, 0), (0, 0, 180))):
            Circle(SKETCH4_R)
    extrude(amount=-CUT_EXTRUDE2_DEPTH, mode=Mode.SUBTRACT)

    # Chamfer1
    chamfer1_edges = [part.edges().sort_by_distance(p)[0] for p in [
        (11, 41.75, -35.15),
        (11, 20.875, -67.65),
        (11, -41.75, -39.85),
        (11, -41.75, 35.15),
        (11, -20.875, 67.65),
        (11, -20.875, -67.65),
        (11, 20.875, 67.65),
        (11, 41.75, 39.85),
    ]]
    chamfer(chamfer1_edges, length=CHAMFER1_SIZE)

    # Sketch5 → Boss-Extrude3 (add)
    with BuildSketch(Plane.XZ.offset(46.75)):
        with Locations((5.5, 0)):
            Rectangle(SKETCH5_W, SKETCH5_H)
    extrude(amount=BOSS_EXTRUDE3_DEPTH)

    # Sketch6 → Boss-Extrude4 (add)
    with BuildSketch(Plane(origin=(0, 46.75, 0), x_dir=(1, 0, 0), z_dir=(0, 1, 0))):
        with Locations((5.5, 0)):
            Rectangle(SKETCH6_W, SKETCH6_H)
    extrude(amount=BOSS_EXTRUDE4_DEPTH)

    # Sketch7 → Boss-Extrude5 (add)
    with BuildSketch(Plane.XY.offset(75)):
        with Locations((5.5, 0)):
            Rectangle(SKETCH7_W, SKETCH7_H)
    extrude(amount=BOSS_EXTRUDE5_DEPTH)

    # Sketch8 → Boss-Extrude6 (add)
    with BuildSketch(Plane(origin=(0, 0, -75), x_dir=(-1, 0, 0), z_dir=(0, 0, -1))):
        with Locations((-5.5, 0)):
            Rectangle(SKETCH8_W, SKETCH8_H)
    extrude(amount=BOSS_EXTRUDE6_DEPTH)

    # Sketch12 → Cut-Extrude3 (cut, through all)
    with BuildSketch(Plane(origin=(11, 0, 0), x_dir=(0, 0, -1), z_dir=(1, 0, 0))):
        with Locations((71, 42.75)):
            Circle(SKETCH12_R)
        with Locations(Location((-71, 42.75, 0), (0, 0, 180))):
            Circle(SKETCH12_R)
        with Locations(Location((71, -42.75, 0), (0, 0, 180))):
            Circle(SKETCH12_R)
        with Locations((-71, -42.75)):
            Circle(SKETCH12_R)
    extrude(amount=-CUT_EXTRUDE3_DEPTH, mode=Mode.SUBTRACT)

    # Chamfer2
    chamfer2_edges = [part.edges().sort_by_distance(p)[0] for p in [
        (11, 42.75, 68.5),
        (11, -42.75, -73.5),
        (11, -42.75, 73.5),
        (11, 42.75, -68.5),
    ]]
    chamfer(chamfer2_edges, length=CHAMFER2_SIZE)


solid = part.part
